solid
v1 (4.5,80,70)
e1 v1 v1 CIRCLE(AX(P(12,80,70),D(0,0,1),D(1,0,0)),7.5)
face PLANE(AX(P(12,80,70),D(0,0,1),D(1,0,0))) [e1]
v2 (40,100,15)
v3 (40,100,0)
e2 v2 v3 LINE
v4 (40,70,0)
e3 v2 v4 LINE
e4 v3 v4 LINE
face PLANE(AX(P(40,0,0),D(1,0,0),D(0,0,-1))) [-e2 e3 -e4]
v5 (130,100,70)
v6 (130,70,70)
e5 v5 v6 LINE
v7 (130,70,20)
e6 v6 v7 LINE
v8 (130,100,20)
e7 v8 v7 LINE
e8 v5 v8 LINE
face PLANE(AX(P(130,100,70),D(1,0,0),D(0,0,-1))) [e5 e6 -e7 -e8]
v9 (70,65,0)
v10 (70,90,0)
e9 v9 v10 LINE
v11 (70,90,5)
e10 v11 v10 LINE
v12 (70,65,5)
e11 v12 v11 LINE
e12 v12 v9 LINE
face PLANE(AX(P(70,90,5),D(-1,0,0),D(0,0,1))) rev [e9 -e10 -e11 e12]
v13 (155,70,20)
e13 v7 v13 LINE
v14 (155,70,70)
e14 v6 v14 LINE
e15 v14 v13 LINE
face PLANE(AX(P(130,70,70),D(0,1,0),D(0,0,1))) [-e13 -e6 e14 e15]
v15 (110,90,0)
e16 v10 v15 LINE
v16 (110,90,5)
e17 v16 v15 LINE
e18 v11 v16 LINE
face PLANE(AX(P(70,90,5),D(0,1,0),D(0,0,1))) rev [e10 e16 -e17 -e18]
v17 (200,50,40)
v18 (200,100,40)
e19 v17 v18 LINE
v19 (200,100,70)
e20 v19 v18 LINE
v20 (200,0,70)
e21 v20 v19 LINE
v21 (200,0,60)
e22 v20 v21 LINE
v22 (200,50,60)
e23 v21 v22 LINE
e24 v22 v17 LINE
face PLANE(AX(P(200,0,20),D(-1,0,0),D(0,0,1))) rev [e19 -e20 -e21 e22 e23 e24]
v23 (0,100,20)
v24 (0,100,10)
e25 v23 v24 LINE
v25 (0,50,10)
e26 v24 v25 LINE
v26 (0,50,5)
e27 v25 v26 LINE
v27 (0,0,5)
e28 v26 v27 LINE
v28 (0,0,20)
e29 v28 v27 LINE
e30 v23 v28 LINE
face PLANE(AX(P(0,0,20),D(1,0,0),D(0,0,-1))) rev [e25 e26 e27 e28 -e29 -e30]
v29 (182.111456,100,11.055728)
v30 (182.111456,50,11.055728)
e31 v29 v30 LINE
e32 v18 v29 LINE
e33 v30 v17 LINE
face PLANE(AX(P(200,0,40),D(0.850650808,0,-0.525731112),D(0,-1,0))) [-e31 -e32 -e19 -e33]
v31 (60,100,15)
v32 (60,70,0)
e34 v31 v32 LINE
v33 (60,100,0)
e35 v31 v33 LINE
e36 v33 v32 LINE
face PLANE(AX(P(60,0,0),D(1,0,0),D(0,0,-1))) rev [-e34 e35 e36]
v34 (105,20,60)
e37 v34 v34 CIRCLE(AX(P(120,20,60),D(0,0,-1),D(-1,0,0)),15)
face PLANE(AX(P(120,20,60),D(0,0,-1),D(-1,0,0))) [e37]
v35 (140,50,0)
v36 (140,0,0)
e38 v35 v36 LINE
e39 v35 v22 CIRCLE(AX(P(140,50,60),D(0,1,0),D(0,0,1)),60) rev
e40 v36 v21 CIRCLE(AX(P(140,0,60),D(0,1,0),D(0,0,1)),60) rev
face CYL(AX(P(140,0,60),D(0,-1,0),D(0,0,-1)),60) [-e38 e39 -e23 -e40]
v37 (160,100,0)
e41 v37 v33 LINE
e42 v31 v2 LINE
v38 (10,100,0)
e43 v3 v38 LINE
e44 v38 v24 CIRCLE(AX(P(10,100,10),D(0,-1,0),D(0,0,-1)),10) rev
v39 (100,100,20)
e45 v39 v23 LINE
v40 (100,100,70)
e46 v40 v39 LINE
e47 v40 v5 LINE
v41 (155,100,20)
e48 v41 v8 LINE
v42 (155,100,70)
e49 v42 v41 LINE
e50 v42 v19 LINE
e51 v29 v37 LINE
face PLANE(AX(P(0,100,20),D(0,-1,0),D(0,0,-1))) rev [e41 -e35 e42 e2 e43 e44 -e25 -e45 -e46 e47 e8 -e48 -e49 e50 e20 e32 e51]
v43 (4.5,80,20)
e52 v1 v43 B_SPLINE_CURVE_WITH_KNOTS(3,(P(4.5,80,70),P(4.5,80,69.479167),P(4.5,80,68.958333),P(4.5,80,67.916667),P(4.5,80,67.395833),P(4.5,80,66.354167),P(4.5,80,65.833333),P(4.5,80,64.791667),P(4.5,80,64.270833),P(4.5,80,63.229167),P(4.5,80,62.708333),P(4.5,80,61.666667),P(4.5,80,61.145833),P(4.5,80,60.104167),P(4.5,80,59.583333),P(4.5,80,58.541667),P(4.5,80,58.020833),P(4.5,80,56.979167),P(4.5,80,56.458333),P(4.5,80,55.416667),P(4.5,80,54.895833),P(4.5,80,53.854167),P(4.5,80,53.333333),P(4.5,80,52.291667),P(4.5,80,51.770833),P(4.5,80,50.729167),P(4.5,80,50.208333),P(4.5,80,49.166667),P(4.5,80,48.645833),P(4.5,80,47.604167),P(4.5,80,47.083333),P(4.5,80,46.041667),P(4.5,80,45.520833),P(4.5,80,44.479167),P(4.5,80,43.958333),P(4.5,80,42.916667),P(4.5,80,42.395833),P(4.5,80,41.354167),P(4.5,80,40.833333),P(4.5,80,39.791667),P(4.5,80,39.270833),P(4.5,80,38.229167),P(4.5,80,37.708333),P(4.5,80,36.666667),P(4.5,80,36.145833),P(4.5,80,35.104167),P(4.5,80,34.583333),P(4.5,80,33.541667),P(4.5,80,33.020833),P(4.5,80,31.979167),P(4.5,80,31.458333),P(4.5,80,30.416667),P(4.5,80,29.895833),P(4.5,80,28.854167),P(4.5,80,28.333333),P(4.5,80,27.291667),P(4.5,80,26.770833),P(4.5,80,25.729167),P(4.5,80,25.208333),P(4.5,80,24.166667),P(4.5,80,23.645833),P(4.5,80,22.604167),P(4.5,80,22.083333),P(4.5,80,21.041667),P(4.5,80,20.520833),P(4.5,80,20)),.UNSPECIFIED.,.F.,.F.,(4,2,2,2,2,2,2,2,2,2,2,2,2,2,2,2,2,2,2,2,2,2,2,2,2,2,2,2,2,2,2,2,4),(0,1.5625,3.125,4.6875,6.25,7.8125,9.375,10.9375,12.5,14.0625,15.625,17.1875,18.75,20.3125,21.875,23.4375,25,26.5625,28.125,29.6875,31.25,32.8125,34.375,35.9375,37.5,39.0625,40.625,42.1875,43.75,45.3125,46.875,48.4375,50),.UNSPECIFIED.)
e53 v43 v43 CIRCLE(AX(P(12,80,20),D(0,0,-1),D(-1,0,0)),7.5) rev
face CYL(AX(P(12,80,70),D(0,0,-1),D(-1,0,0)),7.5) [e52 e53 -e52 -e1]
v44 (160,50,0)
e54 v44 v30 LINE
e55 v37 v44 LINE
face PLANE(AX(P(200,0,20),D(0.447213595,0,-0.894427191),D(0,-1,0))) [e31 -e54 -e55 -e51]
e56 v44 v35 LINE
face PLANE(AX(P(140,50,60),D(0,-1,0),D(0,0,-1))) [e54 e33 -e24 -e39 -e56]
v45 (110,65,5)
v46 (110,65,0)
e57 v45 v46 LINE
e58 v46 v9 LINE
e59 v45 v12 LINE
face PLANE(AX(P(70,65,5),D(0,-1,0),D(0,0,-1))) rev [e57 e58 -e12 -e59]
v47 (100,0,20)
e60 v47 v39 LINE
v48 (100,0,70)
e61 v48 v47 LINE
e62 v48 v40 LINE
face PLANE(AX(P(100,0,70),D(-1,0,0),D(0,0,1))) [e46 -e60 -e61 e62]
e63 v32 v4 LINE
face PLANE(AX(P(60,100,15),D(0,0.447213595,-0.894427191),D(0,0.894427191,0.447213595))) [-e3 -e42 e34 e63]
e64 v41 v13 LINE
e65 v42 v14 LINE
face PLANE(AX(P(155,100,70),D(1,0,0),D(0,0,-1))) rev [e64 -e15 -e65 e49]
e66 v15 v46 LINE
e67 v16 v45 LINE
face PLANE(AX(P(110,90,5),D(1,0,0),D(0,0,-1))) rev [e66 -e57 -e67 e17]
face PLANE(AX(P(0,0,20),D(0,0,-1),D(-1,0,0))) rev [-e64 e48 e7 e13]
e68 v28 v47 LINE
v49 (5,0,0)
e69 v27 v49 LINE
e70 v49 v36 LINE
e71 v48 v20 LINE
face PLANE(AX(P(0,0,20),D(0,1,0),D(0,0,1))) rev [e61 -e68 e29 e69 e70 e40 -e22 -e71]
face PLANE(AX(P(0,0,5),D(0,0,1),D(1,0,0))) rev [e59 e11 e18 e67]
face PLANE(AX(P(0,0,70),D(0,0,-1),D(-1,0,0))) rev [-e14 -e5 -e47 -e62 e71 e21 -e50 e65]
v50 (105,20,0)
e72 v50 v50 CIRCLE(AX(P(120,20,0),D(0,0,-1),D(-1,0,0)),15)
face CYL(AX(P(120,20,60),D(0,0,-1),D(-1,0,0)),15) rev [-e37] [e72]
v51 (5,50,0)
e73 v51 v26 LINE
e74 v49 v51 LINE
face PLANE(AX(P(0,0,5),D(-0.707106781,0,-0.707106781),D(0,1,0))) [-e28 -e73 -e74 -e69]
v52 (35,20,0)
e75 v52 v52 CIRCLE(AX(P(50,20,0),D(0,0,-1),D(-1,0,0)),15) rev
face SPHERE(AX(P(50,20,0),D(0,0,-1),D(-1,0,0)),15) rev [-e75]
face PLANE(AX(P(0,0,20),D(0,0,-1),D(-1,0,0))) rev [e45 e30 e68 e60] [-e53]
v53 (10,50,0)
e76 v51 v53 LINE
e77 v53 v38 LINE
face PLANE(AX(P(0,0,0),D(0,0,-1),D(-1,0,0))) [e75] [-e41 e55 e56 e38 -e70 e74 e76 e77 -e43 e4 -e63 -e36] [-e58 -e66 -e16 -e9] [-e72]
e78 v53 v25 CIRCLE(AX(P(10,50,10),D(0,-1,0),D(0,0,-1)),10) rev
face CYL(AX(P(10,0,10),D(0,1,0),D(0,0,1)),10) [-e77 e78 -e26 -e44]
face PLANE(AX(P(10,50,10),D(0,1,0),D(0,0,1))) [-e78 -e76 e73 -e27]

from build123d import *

# Parameters (mm, degrees)
SKICA1_W                 = 200
SKICA1_H                 = 100
P_IDAT_VYSUNUT_M1_DEPTH  = 20
P_IDAT_VYSUNUT_M2_DEPTH  = 50
SKICA7_R                 = 7.5
P_IDAT_VYSUNUT_M3_DEPTH  = 50
ODEBRAT_VYSUNUT_M3_DEPTH = 10
ZAOBLIT1_START           = 50
ZAOBLIT1_DEPTH           = 51
SKICA9_W                 = 40
SKICA9_H                 = 25
ODEBRAT_VYSUNUT_M4_DEPTH = 5
CHAMFER2_SIZE            = 5
FILLET2_DEPTH            = 50
CHAMFER3_SIZE            = 40
CHAMFER3_SIZE2           = 20
CHAMFER4_SIZE            = 20
SKETCH3_R                = 15
CUT_EXTRUDE2_DEPTH       = 60


with BuildPart() as part:
    # Skica1 → Přidat vysunutím1 (new body)
    with BuildSketch(Plane.XY):
        with Locations((100, 50)):
            Rectangle(SKICA1_W, SKICA1_H)
    extrude(amount=P_IDAT_VYSUNUT_M1_DEPTH)

    # Skica2 → Přidat vysunutím2 (add)
    with BuildSketch(Plane.XY.offset(20)):
        Polygon((100, 0), (200, 0), (200, 100), (155, 100), (155, 70), (130, 70), (130, 100), (100, 100), align=None)
    extrude(amount=P_IDAT_VYSUNUT_M2_DEPTH)

    # Skica7 → Přidat vysunutím3 (add)
    with BuildSketch(Plane.XY.offset(20)):
        with Locations(Location((12, 80, 0), (0, 0, 180))):
            Circle(SKICA7_R)
    extrude(amount=P_IDAT_VYSUNUT_M3_DEPTH)

    # Skica8 → Odebrat vysunutím3 (cut, symmetric)
    with BuildSketch(Plane.ZY.offset(-50)):
        Polygon((0, 100), (0, 70), (15, 100), align=None)
    extrude(amount=ODEBRAT_VYSUNUT_M3_DEPTH, both=True, mode=Mode.SUBTRACT)

    # Zaoblit1: read off the stored shape, not the designer's step
    # Zaoblit1 outline → Zaoblit1 (cut)
    with BuildSketch(Plane(origin=(0, 0, 0), x_dir=(1, 0, 0), z_dir=(0, 1, 0)).offset(ZAOBLIT1_START)):
        with BuildLine():
            ThreePointArc((0, -10), (2.928932188, -2.928932188), (10, 0))
            Line((10, 0), (0, 0))
            Line((0, 0), (0, -10))
        make_face()
    extrude(amount=ZAOBLIT1_DEPTH, mode=Mode.SUBTRACT)

    # Skica9 → Odebrat vysunutím4 (cut)
    with BuildSketch(Plane(origin=(0, 0, 0), x_dir=(-1, 0, 0), z_dir=(0, 0, -1))):
        with Locations((-90, 77.5)):
            Rectangle(SKICA9_W, SKICA9_H)
    extrude(amount=-ODEBRAT_VYSUNUT_M4_DEPTH, mode=Mode.SUBTRACT)

    # Chamfer2
    chamfer2_edges = [part.edges().sort_by_distance(p)[0] for p in [
        (0, 25, 0),
    ]]
    chamfer(chamfer2_edges, length=CHAMFER2_SIZE)

    # Fillet2: read off the stored shape, not the designer's step
    # Fillet2 outline → Fillet2 (cut)
    with BuildSketch(Plane(origin=(0, 0, 0), x_dir=(1, 0, 0), z_dir=(0, 1, 0))):
        with BuildLine():
            Line((200, 0), (140, 0))
            ThreePointArc((140, 0), (182.426406871, -17.573593129), (200, -60))
            Line((200, -60), (200, 0))
        make_face()
    extrude(amount=FILLET2_DEPTH, mode=Mode.SUBTRACT)

    # Chamfer3
    chamfer3_edges = [part.edges().sort_by_distance(p)[0] for p in [
        (200, 75, 0),
    ]]
    chamfer3_side = [part.faces().sort_by_distance(p)[0] for p in [
        (93.302047782, 51.38225256, 0),
    ]]
    chamfer(chamfer3_edges, length=CHAMFER3_SIZE, length2=CHAMFER3_SIZE2, reference=chamfer3_side[0])

    # Chamfer4
    chamfer4_edges = [part.edges().sort_by_distance(p)[0] for p in [
        (200, 75, 20),
    ]]
    chamfer(chamfer4_edges, length=CHAMFER4_SIZE)

    # Sketch2 → Cut-Revolve4 (revolve, cut)
    with BuildSketch(Plane(origin=(0, 0, 0), x_dir=(-1, 0, 0), z_dir=(0, 0, -1))):
        with BuildLine():
            Line((-50, 35), (-50, 5))
            ThreePointArc((-50, 5), (-35, 20), (-50, 35))
        make_face()
    revolve(axis=Axis((50, 35, 0), (0, -1, 0)), mode=Mode.SUBTRACT)

    # Sketch3 → Cut-Extrude2 (cut)
    with BuildSketch(Plane(origin=(0, 0, 0), x_dir=(-1, 0, 0), z_dir=(0, 0, -1))):
        with Locations((-120, 20)):
            Circle(SKETCH3_R)
    extrude(amount=-CUT_EXTRUDE2_DEPTH, mode=Mode.SUBTRACT)


solid = part.part
